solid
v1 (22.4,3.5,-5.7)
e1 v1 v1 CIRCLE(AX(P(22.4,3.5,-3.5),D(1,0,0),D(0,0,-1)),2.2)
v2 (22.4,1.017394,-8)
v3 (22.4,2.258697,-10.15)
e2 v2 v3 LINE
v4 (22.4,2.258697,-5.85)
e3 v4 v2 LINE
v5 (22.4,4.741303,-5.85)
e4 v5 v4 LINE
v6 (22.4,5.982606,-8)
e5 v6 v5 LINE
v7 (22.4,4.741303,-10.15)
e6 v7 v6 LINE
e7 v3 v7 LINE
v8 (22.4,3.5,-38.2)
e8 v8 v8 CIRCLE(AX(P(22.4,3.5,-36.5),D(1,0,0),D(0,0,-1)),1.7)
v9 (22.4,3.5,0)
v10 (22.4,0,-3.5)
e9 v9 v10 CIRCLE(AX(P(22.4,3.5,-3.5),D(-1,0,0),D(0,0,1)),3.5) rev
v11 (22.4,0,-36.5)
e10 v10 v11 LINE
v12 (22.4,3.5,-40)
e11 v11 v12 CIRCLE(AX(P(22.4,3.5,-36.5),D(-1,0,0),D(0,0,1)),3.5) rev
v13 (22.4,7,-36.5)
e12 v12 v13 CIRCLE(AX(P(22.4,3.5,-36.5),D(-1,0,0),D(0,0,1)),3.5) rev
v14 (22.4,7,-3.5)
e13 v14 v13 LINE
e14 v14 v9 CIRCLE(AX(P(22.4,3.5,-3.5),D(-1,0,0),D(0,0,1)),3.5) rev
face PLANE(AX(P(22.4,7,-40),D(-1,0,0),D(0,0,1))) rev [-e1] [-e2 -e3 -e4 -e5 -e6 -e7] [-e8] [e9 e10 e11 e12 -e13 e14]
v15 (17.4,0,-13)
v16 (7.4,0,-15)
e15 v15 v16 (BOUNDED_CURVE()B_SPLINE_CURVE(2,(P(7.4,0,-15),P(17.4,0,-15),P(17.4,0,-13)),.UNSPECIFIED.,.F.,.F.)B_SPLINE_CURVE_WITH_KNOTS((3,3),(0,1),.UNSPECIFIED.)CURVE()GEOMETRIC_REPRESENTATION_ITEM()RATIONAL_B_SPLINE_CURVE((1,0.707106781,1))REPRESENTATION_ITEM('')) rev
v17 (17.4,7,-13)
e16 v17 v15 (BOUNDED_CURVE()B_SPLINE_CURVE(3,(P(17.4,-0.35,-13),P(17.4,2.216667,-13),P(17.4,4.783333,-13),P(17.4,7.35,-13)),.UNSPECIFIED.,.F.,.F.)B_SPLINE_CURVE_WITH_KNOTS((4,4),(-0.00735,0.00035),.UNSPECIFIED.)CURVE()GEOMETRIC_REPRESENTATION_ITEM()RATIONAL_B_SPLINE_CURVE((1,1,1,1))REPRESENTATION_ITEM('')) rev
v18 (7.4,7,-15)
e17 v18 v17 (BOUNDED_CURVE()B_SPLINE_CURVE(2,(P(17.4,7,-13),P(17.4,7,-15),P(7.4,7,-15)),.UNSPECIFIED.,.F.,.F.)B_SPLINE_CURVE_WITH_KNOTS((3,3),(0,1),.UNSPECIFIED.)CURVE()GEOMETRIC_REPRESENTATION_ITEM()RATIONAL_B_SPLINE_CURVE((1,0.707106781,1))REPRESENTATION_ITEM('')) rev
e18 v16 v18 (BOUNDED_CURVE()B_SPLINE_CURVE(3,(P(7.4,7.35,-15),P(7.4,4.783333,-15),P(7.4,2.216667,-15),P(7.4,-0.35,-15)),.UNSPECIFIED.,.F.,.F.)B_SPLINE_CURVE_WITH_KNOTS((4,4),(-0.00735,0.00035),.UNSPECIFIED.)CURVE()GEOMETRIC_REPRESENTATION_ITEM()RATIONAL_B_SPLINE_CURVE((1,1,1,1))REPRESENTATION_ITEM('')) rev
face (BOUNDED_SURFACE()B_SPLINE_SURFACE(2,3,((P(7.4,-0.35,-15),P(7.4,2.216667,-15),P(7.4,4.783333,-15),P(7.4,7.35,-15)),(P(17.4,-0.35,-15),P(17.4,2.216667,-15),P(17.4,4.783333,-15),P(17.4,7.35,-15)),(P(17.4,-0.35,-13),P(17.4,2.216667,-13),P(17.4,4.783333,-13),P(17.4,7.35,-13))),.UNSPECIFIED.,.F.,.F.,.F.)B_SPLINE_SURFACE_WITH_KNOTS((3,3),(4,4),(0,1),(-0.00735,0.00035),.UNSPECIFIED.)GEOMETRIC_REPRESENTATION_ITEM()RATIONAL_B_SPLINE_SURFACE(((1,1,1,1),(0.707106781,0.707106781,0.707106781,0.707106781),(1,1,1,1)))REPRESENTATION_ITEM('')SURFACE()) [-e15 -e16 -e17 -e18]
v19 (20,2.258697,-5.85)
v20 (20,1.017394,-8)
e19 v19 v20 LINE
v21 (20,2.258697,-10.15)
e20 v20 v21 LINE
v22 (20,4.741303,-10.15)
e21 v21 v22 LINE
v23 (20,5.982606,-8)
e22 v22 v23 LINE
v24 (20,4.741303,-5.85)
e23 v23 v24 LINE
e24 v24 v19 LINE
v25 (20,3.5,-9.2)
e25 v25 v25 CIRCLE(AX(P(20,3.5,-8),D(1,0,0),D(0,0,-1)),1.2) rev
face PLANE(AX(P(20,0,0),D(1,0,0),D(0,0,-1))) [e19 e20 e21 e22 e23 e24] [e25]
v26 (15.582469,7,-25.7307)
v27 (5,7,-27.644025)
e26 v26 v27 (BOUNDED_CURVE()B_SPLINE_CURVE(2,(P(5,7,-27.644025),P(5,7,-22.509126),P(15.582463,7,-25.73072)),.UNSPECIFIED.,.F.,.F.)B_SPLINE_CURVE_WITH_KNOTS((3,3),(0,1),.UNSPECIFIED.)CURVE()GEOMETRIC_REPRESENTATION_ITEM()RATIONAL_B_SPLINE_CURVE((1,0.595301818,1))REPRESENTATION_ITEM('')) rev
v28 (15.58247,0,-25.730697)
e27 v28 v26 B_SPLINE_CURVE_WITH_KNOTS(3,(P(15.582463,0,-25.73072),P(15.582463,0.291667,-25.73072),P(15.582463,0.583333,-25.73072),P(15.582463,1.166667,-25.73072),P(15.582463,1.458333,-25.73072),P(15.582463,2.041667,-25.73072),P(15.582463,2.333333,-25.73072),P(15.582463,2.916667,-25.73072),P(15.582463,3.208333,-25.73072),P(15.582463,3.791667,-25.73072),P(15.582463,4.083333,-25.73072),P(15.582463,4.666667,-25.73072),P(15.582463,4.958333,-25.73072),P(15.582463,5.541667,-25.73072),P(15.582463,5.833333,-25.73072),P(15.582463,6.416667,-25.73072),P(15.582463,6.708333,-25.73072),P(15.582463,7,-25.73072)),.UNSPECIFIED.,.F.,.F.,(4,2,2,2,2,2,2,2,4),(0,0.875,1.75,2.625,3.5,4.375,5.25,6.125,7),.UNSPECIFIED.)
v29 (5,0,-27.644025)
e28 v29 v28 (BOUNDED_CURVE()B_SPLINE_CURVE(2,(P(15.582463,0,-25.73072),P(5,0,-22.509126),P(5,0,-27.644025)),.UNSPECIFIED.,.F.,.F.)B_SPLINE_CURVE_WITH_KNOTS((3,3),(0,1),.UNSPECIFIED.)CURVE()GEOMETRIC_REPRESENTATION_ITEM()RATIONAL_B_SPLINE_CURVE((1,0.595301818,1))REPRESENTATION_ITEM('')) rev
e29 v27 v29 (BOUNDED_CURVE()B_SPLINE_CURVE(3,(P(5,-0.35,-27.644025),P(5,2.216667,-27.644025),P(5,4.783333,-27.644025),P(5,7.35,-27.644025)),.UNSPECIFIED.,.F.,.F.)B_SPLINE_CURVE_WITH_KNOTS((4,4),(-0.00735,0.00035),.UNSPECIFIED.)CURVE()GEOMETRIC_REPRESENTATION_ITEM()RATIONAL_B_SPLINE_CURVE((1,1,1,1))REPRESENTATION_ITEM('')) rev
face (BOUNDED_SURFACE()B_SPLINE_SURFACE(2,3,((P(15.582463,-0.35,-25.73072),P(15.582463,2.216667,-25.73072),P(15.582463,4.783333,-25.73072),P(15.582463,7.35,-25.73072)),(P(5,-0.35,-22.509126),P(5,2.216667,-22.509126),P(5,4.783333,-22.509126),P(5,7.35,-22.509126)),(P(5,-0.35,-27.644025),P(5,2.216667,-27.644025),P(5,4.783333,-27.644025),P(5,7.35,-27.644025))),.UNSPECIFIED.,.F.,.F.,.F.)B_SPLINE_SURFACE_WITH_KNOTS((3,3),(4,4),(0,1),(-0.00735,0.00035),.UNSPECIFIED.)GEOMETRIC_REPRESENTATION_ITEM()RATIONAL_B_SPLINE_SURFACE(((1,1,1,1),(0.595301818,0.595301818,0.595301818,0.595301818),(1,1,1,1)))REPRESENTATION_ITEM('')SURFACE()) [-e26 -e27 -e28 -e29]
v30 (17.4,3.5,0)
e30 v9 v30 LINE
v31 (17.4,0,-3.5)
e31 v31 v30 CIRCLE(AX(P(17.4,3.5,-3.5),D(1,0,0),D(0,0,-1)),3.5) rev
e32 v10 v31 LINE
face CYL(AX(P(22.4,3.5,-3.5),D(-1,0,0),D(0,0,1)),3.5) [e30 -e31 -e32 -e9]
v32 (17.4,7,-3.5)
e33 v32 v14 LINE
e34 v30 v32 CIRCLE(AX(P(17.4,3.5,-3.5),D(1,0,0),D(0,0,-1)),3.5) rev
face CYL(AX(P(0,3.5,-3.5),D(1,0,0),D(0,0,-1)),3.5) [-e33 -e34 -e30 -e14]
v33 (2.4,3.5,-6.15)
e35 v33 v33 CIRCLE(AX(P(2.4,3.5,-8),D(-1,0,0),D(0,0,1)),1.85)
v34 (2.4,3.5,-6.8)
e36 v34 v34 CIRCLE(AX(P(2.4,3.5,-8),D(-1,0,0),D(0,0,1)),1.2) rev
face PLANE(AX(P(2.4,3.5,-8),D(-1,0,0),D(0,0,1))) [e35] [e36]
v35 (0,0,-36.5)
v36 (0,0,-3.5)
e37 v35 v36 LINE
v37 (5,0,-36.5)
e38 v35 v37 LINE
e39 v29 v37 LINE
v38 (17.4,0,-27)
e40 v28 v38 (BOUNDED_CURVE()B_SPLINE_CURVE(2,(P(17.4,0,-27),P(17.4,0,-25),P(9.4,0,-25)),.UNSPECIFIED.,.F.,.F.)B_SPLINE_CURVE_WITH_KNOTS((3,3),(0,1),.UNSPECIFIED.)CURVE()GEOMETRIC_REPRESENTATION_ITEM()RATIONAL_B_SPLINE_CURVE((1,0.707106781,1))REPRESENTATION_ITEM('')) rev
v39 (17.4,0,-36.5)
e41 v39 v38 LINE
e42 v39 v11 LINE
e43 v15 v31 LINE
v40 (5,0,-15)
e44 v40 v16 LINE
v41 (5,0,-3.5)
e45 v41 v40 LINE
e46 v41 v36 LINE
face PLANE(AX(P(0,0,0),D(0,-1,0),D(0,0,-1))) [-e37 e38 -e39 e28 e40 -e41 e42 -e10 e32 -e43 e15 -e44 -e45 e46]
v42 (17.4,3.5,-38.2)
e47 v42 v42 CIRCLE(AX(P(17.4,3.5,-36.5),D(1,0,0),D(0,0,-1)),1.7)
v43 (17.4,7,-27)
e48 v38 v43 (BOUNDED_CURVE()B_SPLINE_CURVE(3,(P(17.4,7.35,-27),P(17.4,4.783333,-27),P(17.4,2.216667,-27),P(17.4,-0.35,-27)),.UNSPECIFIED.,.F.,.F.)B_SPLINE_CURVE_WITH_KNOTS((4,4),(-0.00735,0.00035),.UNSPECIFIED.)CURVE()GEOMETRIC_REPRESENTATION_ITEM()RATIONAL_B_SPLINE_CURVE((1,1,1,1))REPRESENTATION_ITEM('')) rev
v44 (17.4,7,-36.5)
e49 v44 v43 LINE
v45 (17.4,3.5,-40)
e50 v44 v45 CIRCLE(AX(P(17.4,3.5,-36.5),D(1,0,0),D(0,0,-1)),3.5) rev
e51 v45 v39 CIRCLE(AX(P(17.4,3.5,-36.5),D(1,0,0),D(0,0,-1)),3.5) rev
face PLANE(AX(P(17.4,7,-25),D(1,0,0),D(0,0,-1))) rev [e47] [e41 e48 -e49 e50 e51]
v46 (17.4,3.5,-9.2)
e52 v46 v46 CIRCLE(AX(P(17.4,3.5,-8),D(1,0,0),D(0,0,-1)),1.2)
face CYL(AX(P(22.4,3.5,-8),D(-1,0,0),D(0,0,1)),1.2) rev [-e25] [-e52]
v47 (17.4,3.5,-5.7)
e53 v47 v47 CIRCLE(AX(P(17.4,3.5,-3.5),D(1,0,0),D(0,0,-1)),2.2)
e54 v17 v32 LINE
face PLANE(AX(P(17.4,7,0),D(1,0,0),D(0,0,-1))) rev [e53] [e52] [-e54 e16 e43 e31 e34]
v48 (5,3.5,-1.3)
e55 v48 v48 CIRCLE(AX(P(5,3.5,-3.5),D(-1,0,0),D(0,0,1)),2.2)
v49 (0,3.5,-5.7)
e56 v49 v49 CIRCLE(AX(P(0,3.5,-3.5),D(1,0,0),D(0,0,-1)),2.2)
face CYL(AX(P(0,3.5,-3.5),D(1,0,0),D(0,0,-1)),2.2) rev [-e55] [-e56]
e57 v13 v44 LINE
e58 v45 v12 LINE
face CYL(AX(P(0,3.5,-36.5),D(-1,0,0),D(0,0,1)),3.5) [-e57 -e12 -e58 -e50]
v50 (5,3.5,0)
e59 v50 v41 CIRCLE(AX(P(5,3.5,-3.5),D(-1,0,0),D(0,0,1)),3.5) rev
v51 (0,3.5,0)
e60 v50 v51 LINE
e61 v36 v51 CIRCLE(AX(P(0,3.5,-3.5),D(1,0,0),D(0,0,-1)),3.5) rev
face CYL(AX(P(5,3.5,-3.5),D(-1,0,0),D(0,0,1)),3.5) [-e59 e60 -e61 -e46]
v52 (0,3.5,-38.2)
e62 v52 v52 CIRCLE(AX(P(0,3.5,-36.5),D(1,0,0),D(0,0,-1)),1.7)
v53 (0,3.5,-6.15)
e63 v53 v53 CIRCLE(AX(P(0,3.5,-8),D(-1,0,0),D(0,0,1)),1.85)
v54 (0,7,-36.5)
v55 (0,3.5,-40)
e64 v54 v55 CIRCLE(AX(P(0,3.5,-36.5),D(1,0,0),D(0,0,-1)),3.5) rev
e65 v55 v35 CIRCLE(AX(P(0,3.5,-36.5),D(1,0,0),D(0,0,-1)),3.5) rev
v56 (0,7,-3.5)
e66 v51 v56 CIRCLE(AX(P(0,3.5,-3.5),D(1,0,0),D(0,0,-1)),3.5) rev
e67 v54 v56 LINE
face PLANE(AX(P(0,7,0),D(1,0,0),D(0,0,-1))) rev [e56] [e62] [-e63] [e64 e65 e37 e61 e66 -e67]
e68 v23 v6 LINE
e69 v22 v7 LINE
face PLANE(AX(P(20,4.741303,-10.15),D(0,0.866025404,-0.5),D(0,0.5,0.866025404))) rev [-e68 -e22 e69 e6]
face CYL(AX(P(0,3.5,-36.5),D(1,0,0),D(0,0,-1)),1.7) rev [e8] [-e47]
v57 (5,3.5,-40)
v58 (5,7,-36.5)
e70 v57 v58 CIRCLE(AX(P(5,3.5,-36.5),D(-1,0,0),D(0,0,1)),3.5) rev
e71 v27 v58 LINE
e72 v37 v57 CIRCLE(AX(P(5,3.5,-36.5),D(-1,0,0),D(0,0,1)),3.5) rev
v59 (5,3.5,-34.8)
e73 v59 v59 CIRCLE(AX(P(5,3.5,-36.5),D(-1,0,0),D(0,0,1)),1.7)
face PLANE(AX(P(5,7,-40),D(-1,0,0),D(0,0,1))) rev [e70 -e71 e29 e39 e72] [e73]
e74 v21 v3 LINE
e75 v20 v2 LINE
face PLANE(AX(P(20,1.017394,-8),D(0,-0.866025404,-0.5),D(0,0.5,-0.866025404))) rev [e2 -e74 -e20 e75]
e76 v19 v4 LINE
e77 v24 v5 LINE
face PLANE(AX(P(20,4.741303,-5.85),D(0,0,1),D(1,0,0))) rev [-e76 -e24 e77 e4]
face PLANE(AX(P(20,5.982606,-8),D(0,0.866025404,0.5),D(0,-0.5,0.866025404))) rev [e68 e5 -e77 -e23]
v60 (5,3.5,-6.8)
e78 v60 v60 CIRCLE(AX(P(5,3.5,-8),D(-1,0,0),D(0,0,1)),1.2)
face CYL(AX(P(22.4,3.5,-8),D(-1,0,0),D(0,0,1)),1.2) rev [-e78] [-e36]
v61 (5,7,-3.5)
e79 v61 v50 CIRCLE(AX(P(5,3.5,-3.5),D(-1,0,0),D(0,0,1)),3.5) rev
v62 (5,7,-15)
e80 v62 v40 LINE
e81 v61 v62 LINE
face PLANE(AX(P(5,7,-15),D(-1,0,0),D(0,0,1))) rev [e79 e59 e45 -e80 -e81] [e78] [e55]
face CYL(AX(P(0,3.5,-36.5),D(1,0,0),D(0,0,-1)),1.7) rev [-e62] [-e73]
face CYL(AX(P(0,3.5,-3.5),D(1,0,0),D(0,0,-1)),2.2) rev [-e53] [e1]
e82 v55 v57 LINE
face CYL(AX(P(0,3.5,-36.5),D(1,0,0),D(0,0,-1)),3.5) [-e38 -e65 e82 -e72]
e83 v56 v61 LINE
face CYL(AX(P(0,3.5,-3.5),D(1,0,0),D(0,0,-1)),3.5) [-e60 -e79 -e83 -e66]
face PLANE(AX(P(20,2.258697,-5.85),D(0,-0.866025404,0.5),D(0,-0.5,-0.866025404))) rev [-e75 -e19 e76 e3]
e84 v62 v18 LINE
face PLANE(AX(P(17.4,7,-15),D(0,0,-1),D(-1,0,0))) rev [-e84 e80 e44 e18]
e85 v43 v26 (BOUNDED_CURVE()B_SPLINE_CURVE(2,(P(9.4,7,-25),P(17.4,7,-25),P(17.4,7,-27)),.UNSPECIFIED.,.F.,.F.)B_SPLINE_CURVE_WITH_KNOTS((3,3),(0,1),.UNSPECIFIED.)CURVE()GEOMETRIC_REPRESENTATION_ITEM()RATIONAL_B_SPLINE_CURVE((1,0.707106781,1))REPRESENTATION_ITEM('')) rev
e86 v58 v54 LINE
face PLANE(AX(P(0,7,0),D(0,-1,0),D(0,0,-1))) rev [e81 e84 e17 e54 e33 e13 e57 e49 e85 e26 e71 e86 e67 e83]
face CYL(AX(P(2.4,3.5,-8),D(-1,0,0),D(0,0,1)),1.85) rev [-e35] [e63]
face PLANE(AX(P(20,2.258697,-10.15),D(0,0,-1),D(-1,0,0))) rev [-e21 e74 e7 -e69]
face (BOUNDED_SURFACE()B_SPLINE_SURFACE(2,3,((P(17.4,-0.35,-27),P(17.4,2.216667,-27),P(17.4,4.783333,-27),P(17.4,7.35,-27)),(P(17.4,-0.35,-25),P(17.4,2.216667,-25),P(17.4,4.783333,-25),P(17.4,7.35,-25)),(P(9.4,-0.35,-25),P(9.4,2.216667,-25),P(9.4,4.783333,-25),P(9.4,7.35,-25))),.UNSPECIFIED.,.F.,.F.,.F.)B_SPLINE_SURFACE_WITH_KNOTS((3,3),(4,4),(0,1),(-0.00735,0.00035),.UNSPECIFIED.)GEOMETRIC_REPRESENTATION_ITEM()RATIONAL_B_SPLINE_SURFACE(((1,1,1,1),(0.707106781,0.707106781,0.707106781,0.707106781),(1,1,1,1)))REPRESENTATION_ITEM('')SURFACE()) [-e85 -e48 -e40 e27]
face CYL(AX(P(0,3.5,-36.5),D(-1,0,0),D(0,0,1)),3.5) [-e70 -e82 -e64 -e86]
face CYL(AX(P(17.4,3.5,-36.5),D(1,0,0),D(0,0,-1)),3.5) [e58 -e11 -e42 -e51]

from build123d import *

# Parameters (mm, degrees)
BOSS_EXTRUDE1_DEPTH = 7
FILLET1_R           = 3.5
SKETCH2_R           = 2.2
SKETCH2_R_2         = 1.7
CUT_EXTRUDE1_DEPTH  = 47.376287044
FILLET2_SIZE        = 8
FILLET2_SIZE_2      = 2
FILLET3_START       = -1
FILLET3_DEPTH       = 9
FILLET3_2_DEPTH     = 7
SKETCH3_R           = 1.2
CUT_EXTRUDE2_DEPTH  = 47.376287108
SKETCH4_R           = 1.85
CUT_EXTRUDE3_DEPTH  = 2.4
CUT_EXTRUDE4_DEPTH  = 2.4


with BuildPart() as part:
    # Sketch1 → Boss-Extrude1 (new body)
    with BuildSketch(Plane(origin=(0, 0, 0), x_dir=(1, 0, 0), z_dir=(0, 1, 0))):
        Polygon((0, 0), (0, 40), (5, 40), (5, 25), (17.4, 25), (17.4, 40), (22.4, 40), (22.4, 0), (17.4, 0), (17.4, 15), (5, 15), (5, 0), align=None)
    extrude(amount=BOSS_EXTRUDE1_DEPTH)

    # Fillet1
    fillet1_edges = [part.edges().sort_by_distance(p)[0] for p in [
        (2.5, 0, -40),
        (2.5, 7, -40),
        (19.9, 0, -40),
        (19.9, 7, -40),
        (2.5, 0, 0),
        (2.5, 7, 0),
        (19.9, 0, 0),
        (19.9, 7, 0),
    ]]
    fillet(fillet1_edges, radius=FILLET1_R - 0.0001)  # a hair under: the kernel refuses the full size

    # Sketch2 → Cut-Extrude1 (cut, through all)
    with BuildSketch(Plane(origin=(22.4, 0, 0), x_dir=(0, 0, -1), z_dir=(1, 0, 0))):
        with Locations((3.5, 3.5)):
            Circle(SKETCH2_R)
        with Locations((36.5, 3.5)):
            Circle(SKETCH2_R_2)
    extrude(amount=-CUT_EXTRUDE1_DEPTH, mode=Mode.SUBTRACT)

    # Fillet2
    # a fillet whose section is not a circle: 8, 2 mm, written as the material it adds along each edge
    with BuildSketch(Plane(origin=(17.4, 0, -25), x_dir=(-1, 0, 0), z_dir=(0, 1, 0))) as fillet2_piece_1:
        with BuildLine():
            Bezier((FILLET2_SIZE, 0), (0, 0), (0, -FILLET2_SIZE_2), weights=[1, 0.707106781, 1])
            Line((0, -FILLET2_SIZE_2), (0, 0))
            Line((0, 0), (FILLET2_SIZE, 0))
        make_face()
    extrude(amount=7)

    # Fillet3: read off the stored shape, not the designer's step
    # Fillet3 outline → Fillet3 (cut)
    with BuildSketch(Plane(origin=(0, 0, 0), x_dir=(1.0, 3.4671016661374288e-12, 0), z_dir=(-3.4671016661374288e-12, 1.0, 2.5010475807975105e-12)).offset(FILLET3_START)):
        with BuildLine():
            add(Edge.make_bspline(
                [(15.582462981, 25.730719902), (12.297568617, 24.730707285), (9.28088208, 25)],
                knots=[0, 0, 0, 0.430571461, 0.430571461, 0.430571461], degree=2, weights=[1, 0.825748512, 0.80155246]))
            add(Edge.make_bspline(
                [(15.582462981, 25.730719902), (13.182155578, 25), (9.4, 25)],
                knots=[0.440891805, 0.440891805, 0.440891805, 1, 1, 1], degree=2, weights=[0.855599999, 0.836241001, 1]))
            Line((9.4, 25), (9.28088208, 25))
        make_face()
    extrude(amount=FILLET3_DEPTH, mode=Mode.SUBTRACT)

    # Fillet3 2 outline → Fillet3 2 (add)
    with BuildSketch(Plane(origin=(0, 0, 0), x_dir=(1.0, 3.4671016661374288e-12, 0), z_dir=(-3.4671016661374288e-12, 1.0, 2.5010475807975105e-12))):
        with BuildLine():
            Line((5, 25), (9.28088208, 25))
            add(Edge.make_bspline(
                [(9.28088208, 25), (5, 25.382144563), (5, 27.644025125)],
                knots=[0.430571461, 0.430571461, 0.430571461, 1, 1, 1], degree=2, weights=[0.80155246, 0.769553306, 1]))
            Line((5, 27.644025125), (5, 25))
        make_face()
        with BuildLine():
            Line((17.4, 15), (7.4, 15))
            add(Edge.make_bspline(
                [(7.4, 15), (17.4, 15), (17.4, 13)],
                knots=[0, 0, 0, 1, 1, 1], degree=2, weights=[1, 0.707106781, 1]))
            Line((17.4, 13), (17.4, 15))
        make_face()
    extrude(amount=FILLET3_2_DEPTH)

    # Sketch3 → Cut-Extrude2 (cut, through all)
    with BuildSketch(Plane.ZY):
        with Locations((-8, 3.5)):
            Circle(SKETCH3_R)
    extrude(amount=-CUT_EXTRUDE2_DEPTH, mode=Mode.SUBTRACT)

    # Sketch4 → Cut-Extrude3 (cut)
    with BuildSketch(Plane.ZY):
        with Locations((-8, 3.5)):
            Circle(SKETCH4_R)
    extrude(amount=-CUT_EXTRUDE3_DEPTH, mode=Mode.SUBTRACT)

    # Sketch5 → Cut-Extrude4 (cut)
    with BuildSketch(Plane(origin=(22.4, 0, 0), x_dir=(0, 0, -1), z_dir=(1, 0, 0))):
        Polygon((10.15, 4.741303079), (8, 5.982606158), (5.85, 4.741303079), (5.85, 2.258696921), (8, 1.017393842), (10.15, 2.258696921), align=None)
    extrude(amount=-CUT_EXTRUDE4_DEPTH, mode=Mode.SUBTRACT)


solid = part.part
